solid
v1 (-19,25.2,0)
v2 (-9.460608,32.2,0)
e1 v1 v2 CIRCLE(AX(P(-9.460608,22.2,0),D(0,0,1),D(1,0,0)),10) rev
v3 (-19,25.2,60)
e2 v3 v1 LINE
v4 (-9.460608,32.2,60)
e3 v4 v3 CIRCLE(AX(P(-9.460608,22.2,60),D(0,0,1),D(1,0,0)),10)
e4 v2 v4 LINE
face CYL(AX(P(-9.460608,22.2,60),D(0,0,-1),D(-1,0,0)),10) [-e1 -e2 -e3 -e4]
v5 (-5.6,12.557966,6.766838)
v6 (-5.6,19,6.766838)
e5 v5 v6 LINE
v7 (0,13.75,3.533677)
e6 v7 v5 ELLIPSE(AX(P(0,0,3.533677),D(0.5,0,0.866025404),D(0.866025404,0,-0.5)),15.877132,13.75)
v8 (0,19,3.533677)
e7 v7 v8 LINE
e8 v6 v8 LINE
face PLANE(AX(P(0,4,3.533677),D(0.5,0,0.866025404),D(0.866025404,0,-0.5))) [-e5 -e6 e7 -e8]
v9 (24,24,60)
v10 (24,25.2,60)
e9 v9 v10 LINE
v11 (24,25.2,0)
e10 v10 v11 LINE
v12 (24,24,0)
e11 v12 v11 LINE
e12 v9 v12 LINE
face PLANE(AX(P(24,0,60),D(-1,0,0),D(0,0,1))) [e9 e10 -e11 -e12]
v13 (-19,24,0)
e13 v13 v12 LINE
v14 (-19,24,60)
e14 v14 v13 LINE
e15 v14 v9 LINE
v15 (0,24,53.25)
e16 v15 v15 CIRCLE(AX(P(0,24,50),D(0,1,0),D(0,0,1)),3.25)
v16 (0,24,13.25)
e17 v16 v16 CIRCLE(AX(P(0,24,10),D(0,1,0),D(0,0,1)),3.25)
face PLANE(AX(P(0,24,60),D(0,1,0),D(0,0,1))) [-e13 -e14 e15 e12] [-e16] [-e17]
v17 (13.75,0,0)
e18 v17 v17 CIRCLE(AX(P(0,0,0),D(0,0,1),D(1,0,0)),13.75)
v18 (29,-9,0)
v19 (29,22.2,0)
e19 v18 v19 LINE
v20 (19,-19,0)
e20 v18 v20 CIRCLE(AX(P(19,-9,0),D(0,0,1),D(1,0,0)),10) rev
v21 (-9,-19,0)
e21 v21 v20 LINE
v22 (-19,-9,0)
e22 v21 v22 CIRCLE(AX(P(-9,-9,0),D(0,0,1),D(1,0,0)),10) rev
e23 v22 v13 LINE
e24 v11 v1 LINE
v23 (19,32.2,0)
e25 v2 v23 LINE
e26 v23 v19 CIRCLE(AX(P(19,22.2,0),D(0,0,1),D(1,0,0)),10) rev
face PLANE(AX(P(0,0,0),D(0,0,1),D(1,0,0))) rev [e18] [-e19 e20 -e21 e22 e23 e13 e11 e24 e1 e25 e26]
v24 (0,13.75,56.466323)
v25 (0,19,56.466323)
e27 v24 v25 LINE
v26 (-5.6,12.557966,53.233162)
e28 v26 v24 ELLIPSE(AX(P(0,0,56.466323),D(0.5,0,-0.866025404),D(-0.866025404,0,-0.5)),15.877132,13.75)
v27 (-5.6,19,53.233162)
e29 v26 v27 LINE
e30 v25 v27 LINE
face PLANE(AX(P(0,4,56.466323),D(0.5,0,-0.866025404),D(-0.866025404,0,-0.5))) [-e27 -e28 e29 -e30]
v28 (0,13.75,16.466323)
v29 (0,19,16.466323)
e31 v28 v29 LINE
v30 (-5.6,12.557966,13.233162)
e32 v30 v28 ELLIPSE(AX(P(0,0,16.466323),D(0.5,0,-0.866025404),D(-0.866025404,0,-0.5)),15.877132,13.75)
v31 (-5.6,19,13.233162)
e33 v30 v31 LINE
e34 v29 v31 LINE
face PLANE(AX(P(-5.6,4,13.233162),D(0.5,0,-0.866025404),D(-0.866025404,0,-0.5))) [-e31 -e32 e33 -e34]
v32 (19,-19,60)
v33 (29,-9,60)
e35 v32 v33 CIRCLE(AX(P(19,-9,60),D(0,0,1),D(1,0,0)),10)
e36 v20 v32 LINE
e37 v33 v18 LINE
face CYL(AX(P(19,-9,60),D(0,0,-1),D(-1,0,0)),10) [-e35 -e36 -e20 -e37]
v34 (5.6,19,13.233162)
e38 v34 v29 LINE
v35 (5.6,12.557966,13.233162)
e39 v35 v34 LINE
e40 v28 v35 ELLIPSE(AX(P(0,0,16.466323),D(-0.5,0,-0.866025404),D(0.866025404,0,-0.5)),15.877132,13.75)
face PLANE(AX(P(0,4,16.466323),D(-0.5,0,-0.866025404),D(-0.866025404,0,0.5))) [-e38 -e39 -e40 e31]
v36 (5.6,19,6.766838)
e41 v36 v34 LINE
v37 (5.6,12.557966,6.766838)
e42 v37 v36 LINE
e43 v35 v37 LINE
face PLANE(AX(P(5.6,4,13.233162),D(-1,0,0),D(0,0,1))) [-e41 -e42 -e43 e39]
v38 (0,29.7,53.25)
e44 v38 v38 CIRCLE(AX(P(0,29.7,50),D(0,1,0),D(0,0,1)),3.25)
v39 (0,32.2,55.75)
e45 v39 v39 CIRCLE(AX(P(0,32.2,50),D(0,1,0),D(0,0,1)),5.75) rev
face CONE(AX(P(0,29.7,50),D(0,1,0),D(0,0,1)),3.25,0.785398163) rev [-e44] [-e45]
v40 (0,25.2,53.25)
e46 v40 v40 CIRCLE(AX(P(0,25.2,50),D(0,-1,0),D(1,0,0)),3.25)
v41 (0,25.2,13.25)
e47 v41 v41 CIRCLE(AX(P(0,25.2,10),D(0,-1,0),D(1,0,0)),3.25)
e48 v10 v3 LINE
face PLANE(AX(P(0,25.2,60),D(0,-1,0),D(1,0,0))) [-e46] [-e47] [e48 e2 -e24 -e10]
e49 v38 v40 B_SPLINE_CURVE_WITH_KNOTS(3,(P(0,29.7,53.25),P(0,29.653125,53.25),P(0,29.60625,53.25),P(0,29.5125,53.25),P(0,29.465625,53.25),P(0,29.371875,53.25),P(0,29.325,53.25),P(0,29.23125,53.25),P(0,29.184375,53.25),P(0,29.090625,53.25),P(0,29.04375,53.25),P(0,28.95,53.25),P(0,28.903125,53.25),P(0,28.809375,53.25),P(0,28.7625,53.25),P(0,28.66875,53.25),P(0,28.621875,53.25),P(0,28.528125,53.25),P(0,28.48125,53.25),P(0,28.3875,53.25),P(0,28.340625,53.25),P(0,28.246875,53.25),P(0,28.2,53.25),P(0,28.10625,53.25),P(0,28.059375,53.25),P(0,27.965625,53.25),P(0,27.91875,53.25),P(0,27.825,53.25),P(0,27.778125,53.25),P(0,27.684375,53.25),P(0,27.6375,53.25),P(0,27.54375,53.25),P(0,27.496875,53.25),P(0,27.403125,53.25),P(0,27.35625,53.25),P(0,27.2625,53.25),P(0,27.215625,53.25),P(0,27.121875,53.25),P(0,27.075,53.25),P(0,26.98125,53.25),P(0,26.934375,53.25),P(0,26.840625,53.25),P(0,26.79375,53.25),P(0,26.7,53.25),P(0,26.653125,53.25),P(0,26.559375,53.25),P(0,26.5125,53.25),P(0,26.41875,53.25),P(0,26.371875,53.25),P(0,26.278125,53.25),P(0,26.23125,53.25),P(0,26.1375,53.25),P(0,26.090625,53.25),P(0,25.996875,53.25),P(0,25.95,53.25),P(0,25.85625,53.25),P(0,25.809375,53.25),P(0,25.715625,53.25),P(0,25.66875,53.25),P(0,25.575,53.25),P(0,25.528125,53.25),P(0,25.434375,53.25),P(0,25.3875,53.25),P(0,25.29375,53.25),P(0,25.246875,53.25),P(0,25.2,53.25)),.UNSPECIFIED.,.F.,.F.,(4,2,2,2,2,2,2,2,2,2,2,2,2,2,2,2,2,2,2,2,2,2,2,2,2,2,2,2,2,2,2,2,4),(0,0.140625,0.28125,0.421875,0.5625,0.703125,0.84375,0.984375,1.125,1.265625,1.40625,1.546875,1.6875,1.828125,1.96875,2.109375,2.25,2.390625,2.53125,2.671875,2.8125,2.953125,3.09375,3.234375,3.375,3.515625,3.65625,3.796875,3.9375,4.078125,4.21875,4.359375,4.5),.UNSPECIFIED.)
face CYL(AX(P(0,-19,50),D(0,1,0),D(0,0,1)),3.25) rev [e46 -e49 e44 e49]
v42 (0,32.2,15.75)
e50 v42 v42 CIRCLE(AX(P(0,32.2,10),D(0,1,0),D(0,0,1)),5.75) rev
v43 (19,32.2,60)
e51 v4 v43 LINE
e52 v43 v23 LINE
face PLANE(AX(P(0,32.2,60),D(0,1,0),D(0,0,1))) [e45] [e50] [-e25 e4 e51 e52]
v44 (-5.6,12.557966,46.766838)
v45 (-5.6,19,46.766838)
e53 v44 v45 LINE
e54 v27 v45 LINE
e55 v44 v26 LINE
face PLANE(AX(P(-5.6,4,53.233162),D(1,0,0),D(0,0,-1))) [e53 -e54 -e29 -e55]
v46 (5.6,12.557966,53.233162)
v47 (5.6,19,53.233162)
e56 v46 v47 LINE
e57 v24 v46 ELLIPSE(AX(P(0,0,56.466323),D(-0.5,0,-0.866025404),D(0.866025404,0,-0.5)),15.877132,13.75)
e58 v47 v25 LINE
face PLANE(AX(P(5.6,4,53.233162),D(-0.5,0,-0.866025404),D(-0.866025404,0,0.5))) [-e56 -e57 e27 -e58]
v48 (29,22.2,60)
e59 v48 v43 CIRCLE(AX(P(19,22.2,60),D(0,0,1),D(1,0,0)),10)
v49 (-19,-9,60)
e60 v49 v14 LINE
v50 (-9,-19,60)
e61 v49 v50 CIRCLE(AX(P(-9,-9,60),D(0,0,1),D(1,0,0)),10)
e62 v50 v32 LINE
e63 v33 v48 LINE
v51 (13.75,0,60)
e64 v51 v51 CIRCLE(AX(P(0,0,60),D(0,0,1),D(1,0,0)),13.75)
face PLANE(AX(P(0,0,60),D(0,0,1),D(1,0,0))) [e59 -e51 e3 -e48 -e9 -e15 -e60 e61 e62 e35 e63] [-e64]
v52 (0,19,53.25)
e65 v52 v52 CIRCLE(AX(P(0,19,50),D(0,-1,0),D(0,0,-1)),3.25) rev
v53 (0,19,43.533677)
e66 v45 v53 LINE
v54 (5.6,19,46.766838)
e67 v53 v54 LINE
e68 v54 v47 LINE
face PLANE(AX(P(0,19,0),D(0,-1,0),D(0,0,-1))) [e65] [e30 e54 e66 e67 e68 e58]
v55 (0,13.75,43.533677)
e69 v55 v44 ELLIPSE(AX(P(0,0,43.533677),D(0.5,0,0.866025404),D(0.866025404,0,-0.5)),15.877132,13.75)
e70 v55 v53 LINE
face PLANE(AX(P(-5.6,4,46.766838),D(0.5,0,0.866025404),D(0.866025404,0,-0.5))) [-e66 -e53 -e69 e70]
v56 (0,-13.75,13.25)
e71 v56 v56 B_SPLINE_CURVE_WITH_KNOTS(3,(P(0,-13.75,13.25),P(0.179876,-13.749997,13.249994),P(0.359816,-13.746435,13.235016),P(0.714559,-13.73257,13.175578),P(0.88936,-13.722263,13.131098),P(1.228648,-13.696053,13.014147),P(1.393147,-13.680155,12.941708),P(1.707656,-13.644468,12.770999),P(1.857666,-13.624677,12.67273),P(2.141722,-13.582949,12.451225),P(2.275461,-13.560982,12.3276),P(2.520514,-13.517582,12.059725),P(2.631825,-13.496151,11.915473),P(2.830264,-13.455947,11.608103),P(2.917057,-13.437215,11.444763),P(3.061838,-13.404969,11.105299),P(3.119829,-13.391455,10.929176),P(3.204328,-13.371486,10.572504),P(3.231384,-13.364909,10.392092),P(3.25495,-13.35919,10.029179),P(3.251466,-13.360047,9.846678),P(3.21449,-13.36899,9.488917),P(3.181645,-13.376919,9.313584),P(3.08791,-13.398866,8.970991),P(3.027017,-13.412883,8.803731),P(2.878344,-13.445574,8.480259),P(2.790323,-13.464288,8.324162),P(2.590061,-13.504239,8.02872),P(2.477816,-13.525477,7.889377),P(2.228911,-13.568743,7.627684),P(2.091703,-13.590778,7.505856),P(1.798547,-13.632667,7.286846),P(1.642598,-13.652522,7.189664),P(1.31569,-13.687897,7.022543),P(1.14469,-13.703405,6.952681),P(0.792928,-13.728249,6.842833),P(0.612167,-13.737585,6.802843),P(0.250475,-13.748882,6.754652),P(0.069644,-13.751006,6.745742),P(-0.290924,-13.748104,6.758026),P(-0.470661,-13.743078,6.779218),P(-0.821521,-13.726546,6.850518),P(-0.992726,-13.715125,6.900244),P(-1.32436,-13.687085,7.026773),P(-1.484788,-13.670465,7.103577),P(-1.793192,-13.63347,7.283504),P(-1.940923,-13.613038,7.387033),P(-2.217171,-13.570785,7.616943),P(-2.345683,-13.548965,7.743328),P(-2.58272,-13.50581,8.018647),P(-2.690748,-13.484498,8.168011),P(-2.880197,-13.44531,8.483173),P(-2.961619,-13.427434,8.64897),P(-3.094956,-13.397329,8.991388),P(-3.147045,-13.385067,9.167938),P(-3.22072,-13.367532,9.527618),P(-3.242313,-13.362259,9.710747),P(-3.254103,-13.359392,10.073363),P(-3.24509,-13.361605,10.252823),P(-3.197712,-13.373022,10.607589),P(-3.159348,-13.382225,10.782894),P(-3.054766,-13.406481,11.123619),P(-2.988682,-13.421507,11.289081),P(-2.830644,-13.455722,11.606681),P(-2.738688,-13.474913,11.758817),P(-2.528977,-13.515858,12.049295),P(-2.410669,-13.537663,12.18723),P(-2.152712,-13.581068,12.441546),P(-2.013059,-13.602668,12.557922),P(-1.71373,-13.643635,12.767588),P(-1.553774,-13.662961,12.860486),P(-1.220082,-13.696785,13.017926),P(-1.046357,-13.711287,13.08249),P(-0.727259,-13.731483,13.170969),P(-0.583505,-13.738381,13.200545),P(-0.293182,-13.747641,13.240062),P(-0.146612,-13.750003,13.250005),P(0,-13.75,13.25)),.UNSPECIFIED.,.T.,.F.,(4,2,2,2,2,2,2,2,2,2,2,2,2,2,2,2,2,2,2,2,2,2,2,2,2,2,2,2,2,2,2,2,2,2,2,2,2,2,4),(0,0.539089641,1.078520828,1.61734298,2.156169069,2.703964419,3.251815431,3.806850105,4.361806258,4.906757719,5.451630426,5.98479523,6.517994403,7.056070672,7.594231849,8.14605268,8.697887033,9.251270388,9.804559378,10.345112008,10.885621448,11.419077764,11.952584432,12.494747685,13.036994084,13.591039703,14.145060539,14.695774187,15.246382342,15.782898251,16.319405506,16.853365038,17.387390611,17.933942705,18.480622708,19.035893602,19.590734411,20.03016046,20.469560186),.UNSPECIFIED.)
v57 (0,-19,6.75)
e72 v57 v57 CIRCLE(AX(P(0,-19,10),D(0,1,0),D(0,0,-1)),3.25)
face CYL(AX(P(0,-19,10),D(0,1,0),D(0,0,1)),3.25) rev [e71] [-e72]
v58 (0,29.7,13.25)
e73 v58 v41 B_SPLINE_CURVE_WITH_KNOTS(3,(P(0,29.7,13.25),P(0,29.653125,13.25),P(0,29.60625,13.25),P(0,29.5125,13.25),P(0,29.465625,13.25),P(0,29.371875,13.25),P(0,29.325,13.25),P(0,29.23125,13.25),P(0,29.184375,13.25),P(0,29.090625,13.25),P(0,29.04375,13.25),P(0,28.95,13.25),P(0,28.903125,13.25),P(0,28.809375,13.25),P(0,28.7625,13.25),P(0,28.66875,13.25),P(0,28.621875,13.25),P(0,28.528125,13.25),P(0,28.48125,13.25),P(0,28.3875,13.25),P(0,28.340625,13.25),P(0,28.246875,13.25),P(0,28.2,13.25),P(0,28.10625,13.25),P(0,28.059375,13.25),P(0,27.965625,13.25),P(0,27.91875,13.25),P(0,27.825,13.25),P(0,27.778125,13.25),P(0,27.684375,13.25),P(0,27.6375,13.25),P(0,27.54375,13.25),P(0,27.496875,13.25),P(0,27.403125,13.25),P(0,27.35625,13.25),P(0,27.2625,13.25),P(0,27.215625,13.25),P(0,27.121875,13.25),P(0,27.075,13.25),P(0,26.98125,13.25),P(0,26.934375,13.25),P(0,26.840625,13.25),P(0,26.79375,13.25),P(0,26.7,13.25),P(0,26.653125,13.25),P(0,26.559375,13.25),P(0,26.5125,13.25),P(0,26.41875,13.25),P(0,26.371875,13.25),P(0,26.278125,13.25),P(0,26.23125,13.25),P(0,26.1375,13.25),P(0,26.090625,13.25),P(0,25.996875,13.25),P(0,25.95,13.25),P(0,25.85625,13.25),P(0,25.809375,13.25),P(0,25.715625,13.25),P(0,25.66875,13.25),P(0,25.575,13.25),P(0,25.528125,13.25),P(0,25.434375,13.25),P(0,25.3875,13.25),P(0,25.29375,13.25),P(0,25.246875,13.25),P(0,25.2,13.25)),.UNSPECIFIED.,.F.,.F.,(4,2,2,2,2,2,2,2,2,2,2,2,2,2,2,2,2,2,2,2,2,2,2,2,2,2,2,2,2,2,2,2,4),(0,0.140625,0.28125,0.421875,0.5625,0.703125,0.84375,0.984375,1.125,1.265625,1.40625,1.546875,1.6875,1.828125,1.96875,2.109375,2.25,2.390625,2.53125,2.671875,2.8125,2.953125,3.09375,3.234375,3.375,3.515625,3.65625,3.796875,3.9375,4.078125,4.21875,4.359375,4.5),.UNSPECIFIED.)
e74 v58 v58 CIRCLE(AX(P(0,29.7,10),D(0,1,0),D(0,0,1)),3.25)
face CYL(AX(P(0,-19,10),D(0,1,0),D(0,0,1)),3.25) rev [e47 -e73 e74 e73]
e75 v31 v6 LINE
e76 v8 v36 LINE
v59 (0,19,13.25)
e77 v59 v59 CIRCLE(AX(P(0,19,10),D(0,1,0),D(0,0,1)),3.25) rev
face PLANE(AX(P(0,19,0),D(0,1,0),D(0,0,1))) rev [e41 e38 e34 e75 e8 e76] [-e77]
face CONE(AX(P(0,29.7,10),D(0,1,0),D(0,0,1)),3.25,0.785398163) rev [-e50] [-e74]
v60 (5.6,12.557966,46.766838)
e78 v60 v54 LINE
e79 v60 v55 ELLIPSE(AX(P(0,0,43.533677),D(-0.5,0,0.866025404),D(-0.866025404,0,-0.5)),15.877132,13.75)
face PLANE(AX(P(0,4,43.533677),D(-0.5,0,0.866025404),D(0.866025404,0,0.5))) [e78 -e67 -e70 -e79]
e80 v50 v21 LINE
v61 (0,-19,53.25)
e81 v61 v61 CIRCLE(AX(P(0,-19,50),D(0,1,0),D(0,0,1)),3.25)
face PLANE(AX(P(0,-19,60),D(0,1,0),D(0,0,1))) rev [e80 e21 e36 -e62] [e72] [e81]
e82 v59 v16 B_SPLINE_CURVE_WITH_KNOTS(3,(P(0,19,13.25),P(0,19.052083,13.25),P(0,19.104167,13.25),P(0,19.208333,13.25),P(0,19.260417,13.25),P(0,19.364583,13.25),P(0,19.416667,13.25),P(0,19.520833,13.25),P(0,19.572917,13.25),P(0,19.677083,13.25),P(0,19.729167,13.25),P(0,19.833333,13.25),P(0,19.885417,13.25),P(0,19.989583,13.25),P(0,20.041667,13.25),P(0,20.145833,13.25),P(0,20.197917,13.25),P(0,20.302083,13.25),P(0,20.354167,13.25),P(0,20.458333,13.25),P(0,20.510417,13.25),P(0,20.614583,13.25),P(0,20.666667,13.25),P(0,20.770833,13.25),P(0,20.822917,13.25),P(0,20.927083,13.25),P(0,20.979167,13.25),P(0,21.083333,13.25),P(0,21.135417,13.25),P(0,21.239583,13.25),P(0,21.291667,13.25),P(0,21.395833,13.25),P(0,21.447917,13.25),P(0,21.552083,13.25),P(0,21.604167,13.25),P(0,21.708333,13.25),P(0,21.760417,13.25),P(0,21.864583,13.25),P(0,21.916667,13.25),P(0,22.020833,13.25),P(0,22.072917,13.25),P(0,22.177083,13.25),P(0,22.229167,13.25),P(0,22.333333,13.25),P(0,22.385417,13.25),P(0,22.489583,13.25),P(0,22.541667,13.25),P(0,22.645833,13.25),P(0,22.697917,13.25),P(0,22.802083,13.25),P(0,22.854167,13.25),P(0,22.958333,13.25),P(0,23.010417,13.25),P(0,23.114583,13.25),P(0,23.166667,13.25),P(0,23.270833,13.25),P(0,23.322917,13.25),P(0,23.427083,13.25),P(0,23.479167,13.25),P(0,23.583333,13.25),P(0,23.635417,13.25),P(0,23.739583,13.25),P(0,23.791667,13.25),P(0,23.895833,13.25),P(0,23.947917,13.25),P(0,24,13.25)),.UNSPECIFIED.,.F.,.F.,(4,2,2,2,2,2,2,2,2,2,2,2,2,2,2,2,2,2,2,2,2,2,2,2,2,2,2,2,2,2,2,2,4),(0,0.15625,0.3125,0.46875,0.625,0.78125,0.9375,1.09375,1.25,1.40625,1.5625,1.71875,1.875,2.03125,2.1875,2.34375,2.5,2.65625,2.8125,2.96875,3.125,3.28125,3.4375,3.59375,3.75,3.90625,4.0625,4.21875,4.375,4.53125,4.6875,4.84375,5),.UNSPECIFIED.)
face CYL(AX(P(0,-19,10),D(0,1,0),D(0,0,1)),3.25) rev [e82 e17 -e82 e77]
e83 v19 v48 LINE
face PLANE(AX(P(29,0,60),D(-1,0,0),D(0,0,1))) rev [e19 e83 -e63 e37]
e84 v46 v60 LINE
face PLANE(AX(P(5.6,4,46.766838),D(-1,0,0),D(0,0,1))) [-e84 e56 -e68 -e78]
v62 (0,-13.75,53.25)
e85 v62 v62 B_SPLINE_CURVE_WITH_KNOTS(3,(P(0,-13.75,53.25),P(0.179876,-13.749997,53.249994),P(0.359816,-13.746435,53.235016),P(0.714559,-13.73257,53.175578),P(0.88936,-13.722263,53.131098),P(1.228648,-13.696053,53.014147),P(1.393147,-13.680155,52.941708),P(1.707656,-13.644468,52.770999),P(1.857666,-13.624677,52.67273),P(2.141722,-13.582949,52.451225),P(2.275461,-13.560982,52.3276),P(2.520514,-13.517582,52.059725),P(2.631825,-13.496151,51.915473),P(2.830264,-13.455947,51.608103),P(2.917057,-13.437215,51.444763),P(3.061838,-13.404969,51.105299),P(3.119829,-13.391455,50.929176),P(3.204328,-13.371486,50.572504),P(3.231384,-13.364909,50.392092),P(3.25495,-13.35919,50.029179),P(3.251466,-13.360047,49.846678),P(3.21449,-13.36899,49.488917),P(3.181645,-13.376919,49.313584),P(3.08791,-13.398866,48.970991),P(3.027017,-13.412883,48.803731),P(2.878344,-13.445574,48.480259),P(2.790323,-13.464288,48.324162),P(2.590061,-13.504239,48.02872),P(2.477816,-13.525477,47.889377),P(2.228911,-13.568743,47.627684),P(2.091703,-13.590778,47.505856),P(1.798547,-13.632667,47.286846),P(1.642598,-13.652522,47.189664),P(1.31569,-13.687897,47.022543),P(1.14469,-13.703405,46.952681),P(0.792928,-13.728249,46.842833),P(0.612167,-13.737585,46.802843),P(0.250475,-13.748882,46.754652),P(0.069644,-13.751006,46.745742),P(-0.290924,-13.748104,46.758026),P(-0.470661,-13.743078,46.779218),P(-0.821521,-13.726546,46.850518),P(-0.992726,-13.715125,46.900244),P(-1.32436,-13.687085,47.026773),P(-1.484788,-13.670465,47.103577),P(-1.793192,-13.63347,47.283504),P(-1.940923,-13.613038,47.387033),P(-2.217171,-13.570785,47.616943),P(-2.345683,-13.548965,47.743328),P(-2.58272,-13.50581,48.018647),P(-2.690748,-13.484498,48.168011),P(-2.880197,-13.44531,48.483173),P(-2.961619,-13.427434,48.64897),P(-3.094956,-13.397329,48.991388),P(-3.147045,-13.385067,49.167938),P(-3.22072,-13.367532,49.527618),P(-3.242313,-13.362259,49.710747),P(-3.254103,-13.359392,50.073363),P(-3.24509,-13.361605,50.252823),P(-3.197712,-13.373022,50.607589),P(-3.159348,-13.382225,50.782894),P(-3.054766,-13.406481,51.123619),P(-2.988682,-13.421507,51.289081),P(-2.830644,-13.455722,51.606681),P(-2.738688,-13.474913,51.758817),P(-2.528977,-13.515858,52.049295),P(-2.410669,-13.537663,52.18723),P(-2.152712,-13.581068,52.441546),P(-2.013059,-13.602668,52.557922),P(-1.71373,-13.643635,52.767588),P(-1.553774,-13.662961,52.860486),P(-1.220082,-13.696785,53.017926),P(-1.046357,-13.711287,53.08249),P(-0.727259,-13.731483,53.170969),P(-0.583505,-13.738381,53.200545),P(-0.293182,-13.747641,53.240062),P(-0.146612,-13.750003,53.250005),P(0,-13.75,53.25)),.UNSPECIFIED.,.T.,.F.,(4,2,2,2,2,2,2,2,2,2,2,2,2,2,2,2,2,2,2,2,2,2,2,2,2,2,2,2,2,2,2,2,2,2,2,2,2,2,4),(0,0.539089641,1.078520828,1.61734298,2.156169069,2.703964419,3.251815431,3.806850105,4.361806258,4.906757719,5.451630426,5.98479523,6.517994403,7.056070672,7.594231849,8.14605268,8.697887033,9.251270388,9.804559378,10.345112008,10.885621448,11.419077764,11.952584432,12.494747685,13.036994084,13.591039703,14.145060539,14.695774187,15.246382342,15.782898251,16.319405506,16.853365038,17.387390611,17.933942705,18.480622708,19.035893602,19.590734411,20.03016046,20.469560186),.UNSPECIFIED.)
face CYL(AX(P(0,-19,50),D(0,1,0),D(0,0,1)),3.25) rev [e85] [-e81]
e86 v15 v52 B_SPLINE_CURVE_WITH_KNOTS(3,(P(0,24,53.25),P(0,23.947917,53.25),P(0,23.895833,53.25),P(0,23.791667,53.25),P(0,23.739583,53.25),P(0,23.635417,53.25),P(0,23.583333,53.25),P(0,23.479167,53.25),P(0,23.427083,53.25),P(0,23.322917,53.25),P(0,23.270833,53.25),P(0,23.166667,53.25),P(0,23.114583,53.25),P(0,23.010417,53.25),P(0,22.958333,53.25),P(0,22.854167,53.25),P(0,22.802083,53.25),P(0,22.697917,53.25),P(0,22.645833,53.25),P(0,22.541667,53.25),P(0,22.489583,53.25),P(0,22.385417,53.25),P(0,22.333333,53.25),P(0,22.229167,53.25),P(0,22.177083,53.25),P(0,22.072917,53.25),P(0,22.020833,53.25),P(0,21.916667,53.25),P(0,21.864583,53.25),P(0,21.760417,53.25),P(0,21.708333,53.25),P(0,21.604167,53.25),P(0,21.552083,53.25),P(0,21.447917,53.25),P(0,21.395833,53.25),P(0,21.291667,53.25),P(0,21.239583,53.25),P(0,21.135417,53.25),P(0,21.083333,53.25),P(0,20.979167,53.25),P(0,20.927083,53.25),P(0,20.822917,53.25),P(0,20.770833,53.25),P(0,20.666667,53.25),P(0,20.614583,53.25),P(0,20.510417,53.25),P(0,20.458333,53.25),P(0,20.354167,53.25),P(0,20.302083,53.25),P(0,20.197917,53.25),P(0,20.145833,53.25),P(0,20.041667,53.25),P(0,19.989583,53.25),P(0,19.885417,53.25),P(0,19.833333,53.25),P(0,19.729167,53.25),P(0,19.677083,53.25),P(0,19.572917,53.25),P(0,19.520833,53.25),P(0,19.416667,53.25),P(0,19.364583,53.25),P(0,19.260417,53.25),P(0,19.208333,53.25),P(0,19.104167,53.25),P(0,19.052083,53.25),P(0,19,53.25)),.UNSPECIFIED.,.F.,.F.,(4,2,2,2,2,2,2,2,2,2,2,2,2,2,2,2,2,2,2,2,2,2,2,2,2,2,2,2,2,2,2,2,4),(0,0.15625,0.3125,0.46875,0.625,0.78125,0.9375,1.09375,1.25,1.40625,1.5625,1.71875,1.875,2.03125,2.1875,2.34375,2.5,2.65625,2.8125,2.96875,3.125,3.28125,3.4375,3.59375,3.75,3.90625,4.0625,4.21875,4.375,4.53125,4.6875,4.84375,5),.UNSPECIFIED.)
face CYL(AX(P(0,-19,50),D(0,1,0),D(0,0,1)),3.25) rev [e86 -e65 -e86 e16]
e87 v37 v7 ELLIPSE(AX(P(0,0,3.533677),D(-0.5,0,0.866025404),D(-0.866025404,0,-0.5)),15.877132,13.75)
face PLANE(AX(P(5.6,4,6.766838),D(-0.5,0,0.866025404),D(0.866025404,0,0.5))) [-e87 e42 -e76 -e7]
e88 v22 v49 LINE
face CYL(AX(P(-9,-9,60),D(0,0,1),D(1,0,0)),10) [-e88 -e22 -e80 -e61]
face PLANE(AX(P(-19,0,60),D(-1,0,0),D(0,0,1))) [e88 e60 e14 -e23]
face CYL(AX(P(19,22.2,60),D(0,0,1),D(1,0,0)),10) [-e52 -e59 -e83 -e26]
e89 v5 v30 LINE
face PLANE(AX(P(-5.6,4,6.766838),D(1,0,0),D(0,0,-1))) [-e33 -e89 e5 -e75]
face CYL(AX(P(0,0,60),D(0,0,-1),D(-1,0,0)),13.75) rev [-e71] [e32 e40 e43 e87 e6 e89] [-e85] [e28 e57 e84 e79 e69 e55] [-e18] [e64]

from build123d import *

# Parameters (mm, degrees)
SKETCH1_W           = 43
SKETCH1_H           = 43
SKETCH1_R           = 13.75
SKETCH1_H_2         = 7
BOSS_EXTRUDE1_DEPTH = 60
SKETCH3_R           = 3.25
CUT_EXTRUDE5_DEPTH  = 85.038324591
CHAMFER2_SIZE       = 2.5
CUT_EXTRUDE6_START  = -38
CUT_EXTRUDE6_DEPTH  = 15
FILLET1_R           = 10


with BuildPart() as part:
    # Sketch1 → Boss-Extrude1 (new body)
    # profile 1 of 3: a face of its own
    with BuildSketch(Plane.XY):
        with Locations((2.5, 2.5)):
            Rectangle(SKETCH1_W, SKETCH1_H)
        Circle(SKETCH1_R, mode=Mode.SUBTRACT)
    # profile 2 of 3: a face of its own
    with BuildSketch(Plane.XY):
        with Locations((2.5, 28.7)):
            Rectangle(SKETCH1_W, SKETCH1_H_2)
    # profile 3 of 3: a face of its own
    with BuildSketch(Plane.XY):
        Polygon((24, 24), (24, -19), (29, -19), (29, 32.2), (24, 32.2), (24, 25.2), align=None)
    extrude(amount=BOSS_EXTRUDE1_DEPTH)

    # Sketch3 → Cut-Extrude5 (cut, through all)
    with BuildSketch(Plane(origin=(0, 32.2, 0), x_dir=(1, 0, 0), z_dir=(0, 1, 0))):
        with Locations(Location((0, -50, 0), (0, 0, 270))):
            Circle(SKETCH3_R)
        with Locations(Location((0, -10, 0), (0, 0, 270))):
            Circle(SKETCH3_R)
    extrude(amount=-CUT_EXTRUDE5_DEPTH, mode=Mode.SUBTRACT)

    # Chamfer2
    chamfer2_edges = [part.edges().sort_by_distance(p)[0] for p in [
        (0, 32.2, 46.75),
        (0, 32.2, 6.75),
    ]]
    chamfer(chamfer2_edges, length=CHAMFER2_SIZE)

    # Sketch7 → Cut-Extrude6 (cut)
    with BuildSketch(Plane.XZ.offset(19).offset(CUT_EXTRUDE6_START)):
        Polygon((0, 43.533676985), (5.6, 46.766838493), (5.6, 53.233161507), (0, 56.466323015), (-5.6, 53.233161507), (-5.6, 46.766838493), align=None)
        Polygon((-5.6, 13.233161507), (0, 16.466323015), (5.6, 13.233161507), (5.6, 6.766838493), (0, 3.533676985), (-5.6, 6.766838493), align=None)
    extrude(amount=CUT_EXTRUDE6_DEPTH, mode=Mode.SUBTRACT)

    # Fillet1
    # the kernel refuses this fillet: 10 mm, written as the material it takes off along each edge
    with BuildSketch(Plane(origin=(-19, -19, -25), x_dir=(1, 0, 0), z_dir=(0, 0, 1)), Plane(origin=(29, 32.2, -25), x_dir=(-1, 0, 0), z_dir=(0, 0, 1)), Plane(origin=(29, -19, -25), x_dir=(0, 1, 0), z_dir=(0, 0, 1))) as fillet1_piece_1:
        with BuildLine():
            CenterArc((FILLET1_R, FILLET1_R), FILLET1_R, 180, 90)
            Line((0, FILLET1_R), (-FILLET1_R * 0.02, FILLET1_R))
            Line((-FILLET1_R * 0.02, FILLET1_R), (-FILLET1_R * 0.02, -FILLET1_R * 0.02))
            Line((-FILLET1_R * 0.02, -FILLET1_R * 0.02), (FILLET1_R, -FILLET1_R * 0.02))
            Line((FILLET1_R, -FILLET1_R * 0.02), (FILLET1_R, 0))
        make_face()
    extrude(amount=110, mode=Mode.SUBTRACT)
    with BuildSketch(Plane(origin=(-19, 32.2, -23.848480035), x_dir=(1, 0, 0), z_dir=(0, 0, 1))) as fillet1_piece_2:
        with BuildLine():
            CenterArc((9.539392014, -10), FILLET1_R, 90, 72.542396876)
            Line((0, -7), (-0.19078784, -6.94))
            ThreePointArc((-0.19078784, -6.94), (-0.2, -3.5), (-0.2, 0))
            Line((-0.2, 0), (0, 0.2))
            Line((0, 0.2), (9.539392014, 0.2))
            Line((9.539392014, 0.2), (9.539392014, 0))
        make_face()
    extrude(amount=107.696960071, mode=Mode.SUBTRACT)


solid = part.part
